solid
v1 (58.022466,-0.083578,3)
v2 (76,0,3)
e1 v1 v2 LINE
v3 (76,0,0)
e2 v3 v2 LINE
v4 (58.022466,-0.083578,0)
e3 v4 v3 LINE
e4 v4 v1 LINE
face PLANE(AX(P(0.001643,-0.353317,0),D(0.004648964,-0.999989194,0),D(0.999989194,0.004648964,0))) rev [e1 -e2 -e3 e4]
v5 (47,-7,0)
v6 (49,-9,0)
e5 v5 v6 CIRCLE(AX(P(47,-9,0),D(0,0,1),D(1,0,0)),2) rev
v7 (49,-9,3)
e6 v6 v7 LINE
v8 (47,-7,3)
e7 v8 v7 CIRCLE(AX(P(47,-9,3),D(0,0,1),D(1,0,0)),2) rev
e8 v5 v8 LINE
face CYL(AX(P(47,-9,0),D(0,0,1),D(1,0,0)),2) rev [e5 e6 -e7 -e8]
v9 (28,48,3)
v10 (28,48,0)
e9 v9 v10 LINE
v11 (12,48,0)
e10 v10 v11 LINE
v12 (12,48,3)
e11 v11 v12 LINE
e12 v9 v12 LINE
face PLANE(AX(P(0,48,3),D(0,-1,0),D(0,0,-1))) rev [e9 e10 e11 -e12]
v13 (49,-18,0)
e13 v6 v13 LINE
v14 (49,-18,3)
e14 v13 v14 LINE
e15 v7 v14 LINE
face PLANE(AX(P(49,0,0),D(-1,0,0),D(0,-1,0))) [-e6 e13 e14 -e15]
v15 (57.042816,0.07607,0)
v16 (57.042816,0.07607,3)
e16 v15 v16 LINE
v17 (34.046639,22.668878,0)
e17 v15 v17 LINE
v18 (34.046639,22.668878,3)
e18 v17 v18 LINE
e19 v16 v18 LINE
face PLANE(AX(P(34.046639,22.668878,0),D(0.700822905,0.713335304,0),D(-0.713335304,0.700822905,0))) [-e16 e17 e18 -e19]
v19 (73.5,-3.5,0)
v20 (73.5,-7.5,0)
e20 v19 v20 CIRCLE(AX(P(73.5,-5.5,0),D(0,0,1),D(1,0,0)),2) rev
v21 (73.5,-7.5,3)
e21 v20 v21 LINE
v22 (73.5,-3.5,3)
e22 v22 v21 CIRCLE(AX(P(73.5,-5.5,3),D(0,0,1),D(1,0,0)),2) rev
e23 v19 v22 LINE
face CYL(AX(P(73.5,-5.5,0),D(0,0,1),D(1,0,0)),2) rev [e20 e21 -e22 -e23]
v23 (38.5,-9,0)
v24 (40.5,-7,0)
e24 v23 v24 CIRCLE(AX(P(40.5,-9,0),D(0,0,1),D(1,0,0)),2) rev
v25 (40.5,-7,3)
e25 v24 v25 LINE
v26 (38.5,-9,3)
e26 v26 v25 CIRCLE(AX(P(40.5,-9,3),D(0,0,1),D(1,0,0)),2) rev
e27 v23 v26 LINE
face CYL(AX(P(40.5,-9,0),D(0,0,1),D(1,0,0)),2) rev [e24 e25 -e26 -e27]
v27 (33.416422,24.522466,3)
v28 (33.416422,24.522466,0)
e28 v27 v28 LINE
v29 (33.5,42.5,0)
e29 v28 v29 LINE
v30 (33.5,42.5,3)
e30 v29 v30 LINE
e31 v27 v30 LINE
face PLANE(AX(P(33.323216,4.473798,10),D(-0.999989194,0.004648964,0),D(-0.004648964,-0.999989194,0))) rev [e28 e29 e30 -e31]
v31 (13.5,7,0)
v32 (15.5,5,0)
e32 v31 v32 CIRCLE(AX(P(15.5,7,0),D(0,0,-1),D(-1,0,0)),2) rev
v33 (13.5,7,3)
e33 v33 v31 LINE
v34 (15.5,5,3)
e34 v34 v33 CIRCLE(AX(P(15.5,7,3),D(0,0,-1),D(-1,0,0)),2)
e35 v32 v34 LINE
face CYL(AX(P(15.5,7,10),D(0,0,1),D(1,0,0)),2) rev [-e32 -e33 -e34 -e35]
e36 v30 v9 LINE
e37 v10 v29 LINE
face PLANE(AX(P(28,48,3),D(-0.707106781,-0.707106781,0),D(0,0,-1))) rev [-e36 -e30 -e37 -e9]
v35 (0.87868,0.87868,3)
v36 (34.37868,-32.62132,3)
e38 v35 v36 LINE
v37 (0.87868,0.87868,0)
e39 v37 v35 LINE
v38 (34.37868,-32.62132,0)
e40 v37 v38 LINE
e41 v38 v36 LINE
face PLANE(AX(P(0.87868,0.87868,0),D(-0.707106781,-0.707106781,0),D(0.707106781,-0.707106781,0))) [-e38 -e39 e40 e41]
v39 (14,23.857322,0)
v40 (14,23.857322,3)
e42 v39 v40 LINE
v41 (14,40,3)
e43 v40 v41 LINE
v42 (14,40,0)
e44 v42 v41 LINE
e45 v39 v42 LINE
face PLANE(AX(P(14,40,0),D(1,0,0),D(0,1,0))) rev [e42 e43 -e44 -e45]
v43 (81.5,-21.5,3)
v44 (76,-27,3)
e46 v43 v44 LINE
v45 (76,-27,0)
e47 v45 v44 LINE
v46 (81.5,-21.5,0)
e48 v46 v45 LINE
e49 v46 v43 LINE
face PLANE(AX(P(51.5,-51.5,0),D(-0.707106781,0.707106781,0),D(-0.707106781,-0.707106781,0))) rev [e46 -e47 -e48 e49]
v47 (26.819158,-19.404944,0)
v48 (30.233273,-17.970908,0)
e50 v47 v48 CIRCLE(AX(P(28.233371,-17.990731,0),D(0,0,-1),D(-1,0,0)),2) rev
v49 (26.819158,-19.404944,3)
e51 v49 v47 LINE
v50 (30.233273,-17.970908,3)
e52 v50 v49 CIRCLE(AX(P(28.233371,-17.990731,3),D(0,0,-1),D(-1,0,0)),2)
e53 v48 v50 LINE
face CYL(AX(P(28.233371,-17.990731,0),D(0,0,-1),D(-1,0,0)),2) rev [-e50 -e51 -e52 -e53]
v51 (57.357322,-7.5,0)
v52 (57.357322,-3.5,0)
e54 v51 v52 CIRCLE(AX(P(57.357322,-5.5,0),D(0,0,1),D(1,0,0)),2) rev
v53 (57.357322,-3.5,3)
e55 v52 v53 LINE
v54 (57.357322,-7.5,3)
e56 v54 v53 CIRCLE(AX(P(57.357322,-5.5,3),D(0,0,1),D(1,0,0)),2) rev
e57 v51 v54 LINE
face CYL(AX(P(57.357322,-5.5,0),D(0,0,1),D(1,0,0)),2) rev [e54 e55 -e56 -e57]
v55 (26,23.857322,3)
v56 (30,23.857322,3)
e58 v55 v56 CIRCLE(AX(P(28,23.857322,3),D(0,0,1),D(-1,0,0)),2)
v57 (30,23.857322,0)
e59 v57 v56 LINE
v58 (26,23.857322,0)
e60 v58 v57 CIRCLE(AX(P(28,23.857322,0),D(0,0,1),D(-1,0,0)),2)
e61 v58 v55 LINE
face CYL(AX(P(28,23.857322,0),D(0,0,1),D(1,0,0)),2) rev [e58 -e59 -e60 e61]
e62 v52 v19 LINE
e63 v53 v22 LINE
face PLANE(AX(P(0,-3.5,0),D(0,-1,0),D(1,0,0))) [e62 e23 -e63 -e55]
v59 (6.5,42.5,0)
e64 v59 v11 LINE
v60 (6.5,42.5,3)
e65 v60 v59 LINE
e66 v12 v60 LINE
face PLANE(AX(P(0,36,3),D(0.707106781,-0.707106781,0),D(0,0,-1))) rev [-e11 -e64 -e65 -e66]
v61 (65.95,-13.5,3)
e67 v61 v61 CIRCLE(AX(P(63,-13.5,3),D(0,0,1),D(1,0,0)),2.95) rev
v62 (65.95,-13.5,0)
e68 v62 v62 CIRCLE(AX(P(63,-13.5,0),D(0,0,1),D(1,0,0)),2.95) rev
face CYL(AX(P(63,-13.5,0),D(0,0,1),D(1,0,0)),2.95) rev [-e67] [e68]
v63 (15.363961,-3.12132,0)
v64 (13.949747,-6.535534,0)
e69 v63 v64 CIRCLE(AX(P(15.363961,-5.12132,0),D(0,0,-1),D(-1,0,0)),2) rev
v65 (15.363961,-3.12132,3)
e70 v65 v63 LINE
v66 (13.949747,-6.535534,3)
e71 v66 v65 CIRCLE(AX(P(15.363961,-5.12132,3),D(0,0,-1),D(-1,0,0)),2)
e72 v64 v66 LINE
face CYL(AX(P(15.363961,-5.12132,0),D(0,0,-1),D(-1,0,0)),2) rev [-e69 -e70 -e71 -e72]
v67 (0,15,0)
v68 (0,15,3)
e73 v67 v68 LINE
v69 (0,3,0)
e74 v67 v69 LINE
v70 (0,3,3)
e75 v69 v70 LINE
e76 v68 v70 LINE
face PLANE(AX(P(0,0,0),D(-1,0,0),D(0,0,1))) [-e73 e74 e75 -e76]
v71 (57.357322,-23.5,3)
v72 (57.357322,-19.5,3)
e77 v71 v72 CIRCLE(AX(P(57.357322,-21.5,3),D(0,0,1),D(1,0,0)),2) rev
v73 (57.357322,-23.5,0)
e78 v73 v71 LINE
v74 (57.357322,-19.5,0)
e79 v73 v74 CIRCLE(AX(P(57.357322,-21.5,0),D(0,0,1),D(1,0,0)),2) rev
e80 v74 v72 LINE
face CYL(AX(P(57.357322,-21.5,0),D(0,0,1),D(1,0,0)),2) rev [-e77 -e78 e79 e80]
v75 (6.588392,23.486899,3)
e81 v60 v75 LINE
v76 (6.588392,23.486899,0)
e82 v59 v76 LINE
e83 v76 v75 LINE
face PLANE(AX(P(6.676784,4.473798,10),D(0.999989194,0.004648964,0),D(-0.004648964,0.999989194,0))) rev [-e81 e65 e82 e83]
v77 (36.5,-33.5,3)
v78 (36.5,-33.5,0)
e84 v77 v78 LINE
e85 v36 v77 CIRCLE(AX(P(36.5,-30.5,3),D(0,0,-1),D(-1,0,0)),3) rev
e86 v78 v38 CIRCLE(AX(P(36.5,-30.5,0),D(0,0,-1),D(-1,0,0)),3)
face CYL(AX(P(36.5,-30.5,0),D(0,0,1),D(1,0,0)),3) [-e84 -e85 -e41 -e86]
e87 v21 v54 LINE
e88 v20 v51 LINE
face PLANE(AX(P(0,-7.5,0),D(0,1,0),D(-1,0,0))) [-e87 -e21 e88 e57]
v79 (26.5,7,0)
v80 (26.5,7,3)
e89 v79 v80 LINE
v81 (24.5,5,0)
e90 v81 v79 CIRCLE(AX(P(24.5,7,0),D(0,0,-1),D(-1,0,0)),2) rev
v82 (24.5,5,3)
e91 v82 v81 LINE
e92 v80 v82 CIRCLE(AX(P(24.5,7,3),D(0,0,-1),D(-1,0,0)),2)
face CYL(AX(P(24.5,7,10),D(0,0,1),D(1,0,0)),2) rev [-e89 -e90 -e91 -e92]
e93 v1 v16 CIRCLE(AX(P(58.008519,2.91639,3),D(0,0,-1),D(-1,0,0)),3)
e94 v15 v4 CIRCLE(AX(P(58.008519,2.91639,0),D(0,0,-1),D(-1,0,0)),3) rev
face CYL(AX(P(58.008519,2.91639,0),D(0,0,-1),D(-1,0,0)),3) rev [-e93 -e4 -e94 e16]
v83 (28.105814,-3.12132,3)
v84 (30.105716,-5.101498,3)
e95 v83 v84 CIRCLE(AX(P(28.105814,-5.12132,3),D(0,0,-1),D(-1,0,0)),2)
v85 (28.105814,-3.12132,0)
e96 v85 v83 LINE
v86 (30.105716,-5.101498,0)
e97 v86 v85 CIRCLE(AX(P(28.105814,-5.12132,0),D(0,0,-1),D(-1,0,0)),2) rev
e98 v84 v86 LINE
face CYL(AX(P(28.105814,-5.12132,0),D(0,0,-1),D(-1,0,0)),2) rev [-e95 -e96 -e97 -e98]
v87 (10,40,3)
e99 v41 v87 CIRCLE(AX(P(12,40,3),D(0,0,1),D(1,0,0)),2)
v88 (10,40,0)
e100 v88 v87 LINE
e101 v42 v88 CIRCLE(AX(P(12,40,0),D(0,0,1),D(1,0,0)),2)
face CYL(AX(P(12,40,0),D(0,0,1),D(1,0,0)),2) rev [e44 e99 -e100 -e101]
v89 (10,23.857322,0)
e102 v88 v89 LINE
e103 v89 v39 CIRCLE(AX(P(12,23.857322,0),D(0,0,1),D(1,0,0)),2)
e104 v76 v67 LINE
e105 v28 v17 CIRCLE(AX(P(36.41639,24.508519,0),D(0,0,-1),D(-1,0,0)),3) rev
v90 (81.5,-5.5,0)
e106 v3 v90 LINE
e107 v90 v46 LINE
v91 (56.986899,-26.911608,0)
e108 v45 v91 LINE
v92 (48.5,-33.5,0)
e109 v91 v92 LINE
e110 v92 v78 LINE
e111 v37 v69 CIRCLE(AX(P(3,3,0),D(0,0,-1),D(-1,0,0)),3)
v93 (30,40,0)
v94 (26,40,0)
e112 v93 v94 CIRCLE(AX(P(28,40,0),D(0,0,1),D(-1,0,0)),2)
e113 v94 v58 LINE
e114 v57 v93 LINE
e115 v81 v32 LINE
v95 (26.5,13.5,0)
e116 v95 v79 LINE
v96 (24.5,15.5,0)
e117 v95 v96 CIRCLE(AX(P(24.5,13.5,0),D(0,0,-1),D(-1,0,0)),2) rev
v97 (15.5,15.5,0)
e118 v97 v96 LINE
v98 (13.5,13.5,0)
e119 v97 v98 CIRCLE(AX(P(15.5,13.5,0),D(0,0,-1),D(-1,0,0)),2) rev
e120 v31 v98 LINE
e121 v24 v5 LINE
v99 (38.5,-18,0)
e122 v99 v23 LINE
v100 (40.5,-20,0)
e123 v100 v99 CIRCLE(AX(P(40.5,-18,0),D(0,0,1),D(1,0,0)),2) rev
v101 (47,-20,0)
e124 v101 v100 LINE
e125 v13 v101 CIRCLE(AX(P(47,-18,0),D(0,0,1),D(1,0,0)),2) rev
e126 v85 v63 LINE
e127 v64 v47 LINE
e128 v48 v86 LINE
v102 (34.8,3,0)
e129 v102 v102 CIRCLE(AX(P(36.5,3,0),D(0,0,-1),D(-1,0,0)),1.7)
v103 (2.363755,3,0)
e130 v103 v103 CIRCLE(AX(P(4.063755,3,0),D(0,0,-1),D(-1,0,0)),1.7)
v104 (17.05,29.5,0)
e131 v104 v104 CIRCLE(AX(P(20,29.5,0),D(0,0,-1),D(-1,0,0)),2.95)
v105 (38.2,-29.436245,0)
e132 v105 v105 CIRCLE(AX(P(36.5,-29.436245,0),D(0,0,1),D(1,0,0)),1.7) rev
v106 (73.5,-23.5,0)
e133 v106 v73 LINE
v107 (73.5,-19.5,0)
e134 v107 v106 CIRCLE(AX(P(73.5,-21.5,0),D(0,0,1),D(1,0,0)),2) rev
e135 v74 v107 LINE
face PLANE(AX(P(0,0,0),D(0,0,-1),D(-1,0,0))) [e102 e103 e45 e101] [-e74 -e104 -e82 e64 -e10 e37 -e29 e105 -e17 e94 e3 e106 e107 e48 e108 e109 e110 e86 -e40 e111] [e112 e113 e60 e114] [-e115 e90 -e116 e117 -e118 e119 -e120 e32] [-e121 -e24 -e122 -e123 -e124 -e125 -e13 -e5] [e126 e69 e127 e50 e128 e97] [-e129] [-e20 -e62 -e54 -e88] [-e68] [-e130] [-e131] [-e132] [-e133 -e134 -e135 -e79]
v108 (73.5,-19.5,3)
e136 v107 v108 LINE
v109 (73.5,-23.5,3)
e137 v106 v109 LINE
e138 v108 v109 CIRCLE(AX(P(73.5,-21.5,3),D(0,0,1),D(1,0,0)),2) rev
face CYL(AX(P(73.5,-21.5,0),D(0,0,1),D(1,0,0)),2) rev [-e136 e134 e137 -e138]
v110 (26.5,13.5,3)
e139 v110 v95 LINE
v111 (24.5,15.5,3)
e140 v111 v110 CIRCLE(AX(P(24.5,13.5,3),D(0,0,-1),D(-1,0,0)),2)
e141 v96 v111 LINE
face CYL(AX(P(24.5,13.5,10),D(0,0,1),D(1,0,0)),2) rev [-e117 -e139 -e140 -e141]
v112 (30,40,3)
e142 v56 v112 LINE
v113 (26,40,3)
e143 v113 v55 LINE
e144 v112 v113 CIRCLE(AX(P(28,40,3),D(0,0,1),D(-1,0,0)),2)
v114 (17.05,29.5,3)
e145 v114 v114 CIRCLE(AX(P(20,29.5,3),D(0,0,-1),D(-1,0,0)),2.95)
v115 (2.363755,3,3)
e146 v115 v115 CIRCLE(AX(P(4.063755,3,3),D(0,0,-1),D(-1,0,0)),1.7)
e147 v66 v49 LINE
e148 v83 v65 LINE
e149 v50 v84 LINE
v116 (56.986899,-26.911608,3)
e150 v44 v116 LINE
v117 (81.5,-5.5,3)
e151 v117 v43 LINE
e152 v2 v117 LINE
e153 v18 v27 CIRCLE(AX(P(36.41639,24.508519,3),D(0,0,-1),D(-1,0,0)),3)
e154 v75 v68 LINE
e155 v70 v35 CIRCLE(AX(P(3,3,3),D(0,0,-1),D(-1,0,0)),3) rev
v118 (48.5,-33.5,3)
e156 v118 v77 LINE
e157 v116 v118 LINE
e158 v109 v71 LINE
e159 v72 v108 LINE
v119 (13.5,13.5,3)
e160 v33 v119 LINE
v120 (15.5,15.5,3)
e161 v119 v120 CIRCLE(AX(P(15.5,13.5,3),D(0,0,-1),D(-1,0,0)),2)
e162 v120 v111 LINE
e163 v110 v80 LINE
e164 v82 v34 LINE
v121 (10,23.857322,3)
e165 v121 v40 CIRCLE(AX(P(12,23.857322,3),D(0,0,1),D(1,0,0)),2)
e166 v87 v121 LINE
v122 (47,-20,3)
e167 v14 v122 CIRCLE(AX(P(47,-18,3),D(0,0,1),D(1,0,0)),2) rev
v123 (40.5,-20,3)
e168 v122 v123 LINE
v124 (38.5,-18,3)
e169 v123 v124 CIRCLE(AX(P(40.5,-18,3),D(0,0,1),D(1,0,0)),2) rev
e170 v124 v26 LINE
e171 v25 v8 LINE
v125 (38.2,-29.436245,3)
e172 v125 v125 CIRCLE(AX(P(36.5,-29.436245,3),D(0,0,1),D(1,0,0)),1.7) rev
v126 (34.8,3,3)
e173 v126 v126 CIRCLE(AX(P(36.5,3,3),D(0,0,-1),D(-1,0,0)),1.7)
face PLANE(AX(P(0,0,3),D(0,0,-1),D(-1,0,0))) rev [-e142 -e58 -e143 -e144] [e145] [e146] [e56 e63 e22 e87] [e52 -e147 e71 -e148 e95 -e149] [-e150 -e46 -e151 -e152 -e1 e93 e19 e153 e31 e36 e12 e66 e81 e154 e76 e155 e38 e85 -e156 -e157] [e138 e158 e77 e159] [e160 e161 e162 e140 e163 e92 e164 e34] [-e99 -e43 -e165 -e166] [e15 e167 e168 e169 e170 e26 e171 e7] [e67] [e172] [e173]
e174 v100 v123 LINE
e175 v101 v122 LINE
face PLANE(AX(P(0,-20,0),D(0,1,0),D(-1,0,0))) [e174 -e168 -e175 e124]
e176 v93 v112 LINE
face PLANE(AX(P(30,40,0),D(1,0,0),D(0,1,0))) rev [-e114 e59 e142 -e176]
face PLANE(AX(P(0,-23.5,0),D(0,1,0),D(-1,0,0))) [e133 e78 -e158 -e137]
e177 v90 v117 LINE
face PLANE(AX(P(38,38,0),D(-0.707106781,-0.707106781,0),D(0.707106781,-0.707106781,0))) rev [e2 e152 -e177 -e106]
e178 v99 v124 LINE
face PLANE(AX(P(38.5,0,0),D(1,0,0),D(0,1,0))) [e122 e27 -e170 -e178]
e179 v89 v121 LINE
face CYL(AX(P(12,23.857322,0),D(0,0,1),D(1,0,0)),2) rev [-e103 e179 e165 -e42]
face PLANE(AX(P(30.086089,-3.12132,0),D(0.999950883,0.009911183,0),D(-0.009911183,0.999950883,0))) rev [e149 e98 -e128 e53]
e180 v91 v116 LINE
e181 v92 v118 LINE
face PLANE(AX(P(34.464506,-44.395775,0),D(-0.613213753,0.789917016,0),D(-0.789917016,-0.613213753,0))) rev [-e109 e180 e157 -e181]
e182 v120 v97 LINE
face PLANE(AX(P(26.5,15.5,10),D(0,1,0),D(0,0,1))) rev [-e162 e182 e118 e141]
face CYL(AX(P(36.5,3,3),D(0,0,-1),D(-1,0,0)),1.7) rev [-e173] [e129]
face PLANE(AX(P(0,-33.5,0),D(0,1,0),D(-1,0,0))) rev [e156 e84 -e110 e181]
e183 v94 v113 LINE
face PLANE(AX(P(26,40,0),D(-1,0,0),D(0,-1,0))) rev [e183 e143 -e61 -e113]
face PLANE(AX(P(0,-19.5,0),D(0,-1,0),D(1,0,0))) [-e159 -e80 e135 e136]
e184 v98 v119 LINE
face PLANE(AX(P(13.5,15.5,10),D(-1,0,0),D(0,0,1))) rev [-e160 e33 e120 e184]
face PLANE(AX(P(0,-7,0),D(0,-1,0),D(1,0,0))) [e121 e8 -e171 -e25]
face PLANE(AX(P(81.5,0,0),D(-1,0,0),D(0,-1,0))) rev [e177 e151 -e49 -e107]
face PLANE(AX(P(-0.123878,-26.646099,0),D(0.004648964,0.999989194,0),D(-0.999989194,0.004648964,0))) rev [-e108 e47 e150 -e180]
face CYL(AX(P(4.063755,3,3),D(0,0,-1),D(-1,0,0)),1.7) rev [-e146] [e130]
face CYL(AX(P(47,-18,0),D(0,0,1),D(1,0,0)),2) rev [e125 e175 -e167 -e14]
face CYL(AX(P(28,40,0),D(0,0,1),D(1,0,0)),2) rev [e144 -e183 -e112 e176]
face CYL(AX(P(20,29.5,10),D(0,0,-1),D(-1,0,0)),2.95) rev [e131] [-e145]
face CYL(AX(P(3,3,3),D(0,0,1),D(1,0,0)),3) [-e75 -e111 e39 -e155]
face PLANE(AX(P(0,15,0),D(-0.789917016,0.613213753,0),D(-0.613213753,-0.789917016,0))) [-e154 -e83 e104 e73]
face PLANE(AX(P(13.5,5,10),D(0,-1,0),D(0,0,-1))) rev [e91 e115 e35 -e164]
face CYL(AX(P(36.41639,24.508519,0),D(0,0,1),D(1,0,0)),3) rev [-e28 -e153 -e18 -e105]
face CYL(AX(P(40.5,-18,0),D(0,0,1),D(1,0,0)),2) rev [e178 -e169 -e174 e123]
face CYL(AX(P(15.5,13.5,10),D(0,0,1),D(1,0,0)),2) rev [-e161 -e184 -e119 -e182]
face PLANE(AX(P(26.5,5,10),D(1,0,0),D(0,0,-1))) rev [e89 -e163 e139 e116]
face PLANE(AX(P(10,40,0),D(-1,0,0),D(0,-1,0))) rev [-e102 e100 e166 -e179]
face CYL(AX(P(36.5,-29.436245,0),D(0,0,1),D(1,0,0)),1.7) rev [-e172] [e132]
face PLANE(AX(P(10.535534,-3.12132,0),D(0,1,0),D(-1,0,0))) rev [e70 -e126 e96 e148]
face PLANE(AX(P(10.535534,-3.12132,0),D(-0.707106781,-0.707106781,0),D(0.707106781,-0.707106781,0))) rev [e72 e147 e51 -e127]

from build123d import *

# Parameters (mm, degrees)
SKETCH_1_W          = 40
SKETCH_1_H          = 48
EXTRUDE_1_DEPTH     = 3
CHAMFER_1_SIZE      = 12
SKETCH_2_R          = 2.95
SKETCH_2_W          = 13
SKETCH_2_H          = 10.5
CUT_EXTRUDE_1_DEPTH = 10
EXTRUDE_2_DEPTH     = 3
FILLET_1_R          = 2
CUT_EXTRUDE_3_DEPTH = 3
SKETCH_10_R         = 1.7
CUT_EXTRUDE_4_DEPTH = 3
SKETCH_12_R         = 1.7
SKETCH_12_R_2       = 2.95
EXTRUDE_4_DEPTH     = 3
FILLET_2_R          = 3
FILLET_3_R          = 13
FILLET_4_R          = 3
EXTRUDE_5_DEPTH     = 3
FILLET_5_R          = 2


with BuildPart() as part:
    # 草图1 → 凸台-拉伸1 (new body)
    with BuildSketch(Plane.XY):
        with Locations((20, 24)):
            Rectangle(SKETCH_1_W, SKETCH_1_H)
    extrude(amount=EXTRUDE_1_DEPTH)

    # 倒角1
    chamfer_1_edges = [part.edges().sort_by_distance(p)[0] for p in [
        (0, 48, 1.5),
        (40, 48, 1.5),
    ]]
    chamfer(chamfer_1_edges, length=CHAMFER_1_SIZE)

    # 草图2 → 切除-拉伸1 (cut)
    with BuildSketch(Plane(origin=(0, 0, 0), x_dir=(-1, 0, 0), z_dir=(0, 0, -1))):
        with Locations((-20, 29.5)):
            Circle(SKETCH_2_R)
        with BuildLine():
            Line((-6.676784368, 4.473797691), (-6.5, 42.5))
            Line((-6.5, 42.5), (0, 36))
            Line((0, 36), (0, 0))
            Line((0, 0), (-1.349561874, 1.722051065))
            ThreePointArc((-1.349561874, 1.722051065), (-2.686952607, 5.665410674), (-6.676784368, 4.473797691))
        make_face()
        with BuildLine():
            Line((-33.5, 42.5), (-40, 36))
            Line((-40, 36), (-40, 0))
            Line((-40, 0), (-38.650438126, 1.722051065))
            ThreePointArc((-38.650438126, 1.722051065), (-37.313047393, 5.665410674), (-33.323215632, 4.473797691))
            Line((-33.323215632, 4.473797691), (-33.5, 42.5))
        make_face()
        with Locations((-20, 10.25)):
            Rectangle(SKETCH_2_W, SKETCH_2_H)
    extrude(amount=-CUT_EXTRUDE_1_DEPTH, mode=Mode.SUBTRACT)

    # 草图6 → 凸台-拉伸2 (add)
    with BuildSketch(Plane.XY.offset(3)):
        Polygon((0, 0), (0, 15), (6.588392184, 23.486898846), (6.676784368, 4.473797691), (1.450726441, 4.473797691), (1.450726441, 0), align=None)
        Polygon((40, 15), (33.411607816, 23.486898846), (33.323215632, 4.473797691), (38.549273559, 4.473797691), (38.549273559, 0), (40, 0), align=None)
    extrude(amount=-EXTRUDE_2_DEPTH)

    # 圆角1
    fillet_1_edges = [part.edges().sort_by_distance(p)[0] for p in [
        (13.5, 15.5, 1.5),
        (13.5, 5, 1.5),
        (26.5, 5, 1.5),
        (26.5, 15.5, 1.5),
    ]]
    fillet(fillet_1_edges, radius=FILLET_1_R)

    # 草图7 → 切除-拉伸3 (cut)
    with BuildSketch(Plane.XY.offset(3)):
        with BuildLine():
            Line((14, 40), (14, 23.857322167))
            ThreePointArc((14, 23.857322167), (12, 21.857322167), (10, 23.857322167))
            Line((10, 23.857322167), (10, 40))
            ThreePointArc((10, 40), (12, 42), (14, 40))
        make_face()
        with BuildLine():
            Line((26, 40), (26, 23.857322167))
            ThreePointArc((26, 23.857322167), (28, 21.857322167), (30, 23.857322167))
            Line((30, 23.857322167), (30, 40))
            ThreePointArc((30, 40), (28, 42), (26, 40))
        make_face()
    extrude(amount=-CUT_EXTRUDE_3_DEPTH, mode=Mode.SUBTRACT)

    # 草图10 → 切除-拉伸4 (cut)
    with BuildSketch(Plane(origin=(0, 0, 0), x_dir=(-1, 0, 0), z_dir=(0, 0, -1))):
        with Locations((-4.063755404, 3)):
            Circle(SKETCH_10_R)
        with Locations((-36.5, 3)):
            Circle(SKETCH_10_R)
    extrude(amount=-CUT_EXTRUDE_4_DEPTH, mode=Mode.SUBTRACT)

    # 草图12 → 凸台-拉伸4 (add)
    with BuildSketch(Plane.XY.offset(3)):
        Polygon((33.5, 0), (33.5, -33.5), (48.5, -33.5), (56.986898846, -26.911607816), (76, -27), (81.5, -21.5), (81.5, -5.5), (76, 0), (56.986898846, -0.088392184), (48.5, 6.5), (40, 6.5), (40, 0), align=None)
        with Locations((36.5, -29.436244596)):
            Circle(SKETCH_12_R, mode=Mode.SUBTRACT)
        with BuildLine():
            ThreePointArc((40.5, -20), (39.085786438, -19.414213562), (38.5, -18))
            Line((38.5, -18), (38.5, -9))
            ThreePointArc((38.5, -9), (39.085786438, -7.585786438), (40.5, -7))
            Line((40.5, -7), (47, -7))
            ThreePointArc((47, -7), (48.414213562, -7.585786438), (49, -9))
            Line((49, -9), (49, -18))
            ThreePointArc((49, -18), (48.414213562, -19.414213562), (47, -20))
            Line((47, -20), (40.5, -20))
        make_face(mode=Mode.SUBTRACT)
        with BuildLine():
            ThreePointArc((73.5, -19.5), (75.5, -21.5), (73.5, -23.5))
            Line((73.5, -23.5), (57.357322167, -23.5))
            ThreePointArc((57.357322167, -23.5), (55.357322167, -21.5), (57.357322167, -19.5))
            Line((57.357322167, -19.5), (73.5, -19.5))
        make_face(mode=Mode.SUBTRACT)
        with Locations((63, -13.5)):
            Circle(SKETCH_12_R_2, mode=Mode.SUBTRACT)
        with BuildLine():
            ThreePointArc((57.357322167, -7.5), (55.357322167, -5.5), (57.357322167, -3.5))
            Line((57.357322167, -3.5), (73.5, -3.5))
            ThreePointArc((73.5, -3.5), (75.5, -5.5), (73.5, -7.5))
            Line((73.5, -7.5), (57.357322167, -7.5))
        make_face(mode=Mode.SUBTRACT)
    extrude(amount=-EXTRUDE_4_DEPTH)

    # 圆角2
    fillet_2_edges = [part.edges().sort_by_distance(p)[0] for p in [
        (33.5, -33.5, 1.5),
        (33.5, 0, 1.5),
        (0, 0, 1.5),
    ]]
    fillet(fillet_2_edges, radius=FILLET_2_R)

    # 圆角3
    # the kernel refuses this fillet: 13 mm, written as the material it adds along each edge
    with BuildSketch(Plane(origin=(40, 6.5, 3), x_dir=(0, 1, 0), z_dir=(0, 0, -1))) as fillet_3_piece_1:
        with BuildLine():
            CenterArc((12.400920193, 12.400920193), FILLET_3_R, 197.46185463, 55.076290741)
            Line((0, 8.5), (0, 0))
            Line((0, 0), (8.5, 0))
        make_face()
    extrude(amount=3)

    # 圆角4
    fillet_4_edges = [part.edges().sort_by_distance(p)[0] for p in [
        (33.411607816, 23.486898846, 1.5),
        (56.986898846, -0.088392184, 1.5),
    ]]
    fillet(fillet_4_edges, radius=FILLET_4_R)

    # 草图13 → 凸台-拉伸5 (add)
    # profile 1 of 2: a face of its own
    with BuildSketch(Plane.XY.offset(3)):
        Polygon((34.046638715, 22.66887787), (57.042815657, 0.076069922), (39.491091869, 6.043623433), align=None)
    # profile 2 of 2: a face of its own
    with BuildSketch(Plane.XY.offset(3)):
        Polygon((0.878679656, 0.878679656), (34.378679656, -32.621320344), (34.046638715, 0.878679656), align=None)
        Polygon((10.535533906, -3.121320344), (30.281807462, -22.8675939), (30.086088917, -3.121320344), align=None, mode=Mode.SUBTRACT)
    extrude(amount=-EXTRUDE_5_DEPTH)

    # 圆角5
    fillet_5_edges = [part.edges().sort_by_distance(p)[0] for p in [
        (30.086088917, -3.121320344, 1.5),
        (30.281807462, -22.8675939, 1.5),
        (10.535533906, -3.121320344, 1.5),
    ]]
    fillet(fillet_5_edges, radius=FILLET_5_R)


solid = part.part
